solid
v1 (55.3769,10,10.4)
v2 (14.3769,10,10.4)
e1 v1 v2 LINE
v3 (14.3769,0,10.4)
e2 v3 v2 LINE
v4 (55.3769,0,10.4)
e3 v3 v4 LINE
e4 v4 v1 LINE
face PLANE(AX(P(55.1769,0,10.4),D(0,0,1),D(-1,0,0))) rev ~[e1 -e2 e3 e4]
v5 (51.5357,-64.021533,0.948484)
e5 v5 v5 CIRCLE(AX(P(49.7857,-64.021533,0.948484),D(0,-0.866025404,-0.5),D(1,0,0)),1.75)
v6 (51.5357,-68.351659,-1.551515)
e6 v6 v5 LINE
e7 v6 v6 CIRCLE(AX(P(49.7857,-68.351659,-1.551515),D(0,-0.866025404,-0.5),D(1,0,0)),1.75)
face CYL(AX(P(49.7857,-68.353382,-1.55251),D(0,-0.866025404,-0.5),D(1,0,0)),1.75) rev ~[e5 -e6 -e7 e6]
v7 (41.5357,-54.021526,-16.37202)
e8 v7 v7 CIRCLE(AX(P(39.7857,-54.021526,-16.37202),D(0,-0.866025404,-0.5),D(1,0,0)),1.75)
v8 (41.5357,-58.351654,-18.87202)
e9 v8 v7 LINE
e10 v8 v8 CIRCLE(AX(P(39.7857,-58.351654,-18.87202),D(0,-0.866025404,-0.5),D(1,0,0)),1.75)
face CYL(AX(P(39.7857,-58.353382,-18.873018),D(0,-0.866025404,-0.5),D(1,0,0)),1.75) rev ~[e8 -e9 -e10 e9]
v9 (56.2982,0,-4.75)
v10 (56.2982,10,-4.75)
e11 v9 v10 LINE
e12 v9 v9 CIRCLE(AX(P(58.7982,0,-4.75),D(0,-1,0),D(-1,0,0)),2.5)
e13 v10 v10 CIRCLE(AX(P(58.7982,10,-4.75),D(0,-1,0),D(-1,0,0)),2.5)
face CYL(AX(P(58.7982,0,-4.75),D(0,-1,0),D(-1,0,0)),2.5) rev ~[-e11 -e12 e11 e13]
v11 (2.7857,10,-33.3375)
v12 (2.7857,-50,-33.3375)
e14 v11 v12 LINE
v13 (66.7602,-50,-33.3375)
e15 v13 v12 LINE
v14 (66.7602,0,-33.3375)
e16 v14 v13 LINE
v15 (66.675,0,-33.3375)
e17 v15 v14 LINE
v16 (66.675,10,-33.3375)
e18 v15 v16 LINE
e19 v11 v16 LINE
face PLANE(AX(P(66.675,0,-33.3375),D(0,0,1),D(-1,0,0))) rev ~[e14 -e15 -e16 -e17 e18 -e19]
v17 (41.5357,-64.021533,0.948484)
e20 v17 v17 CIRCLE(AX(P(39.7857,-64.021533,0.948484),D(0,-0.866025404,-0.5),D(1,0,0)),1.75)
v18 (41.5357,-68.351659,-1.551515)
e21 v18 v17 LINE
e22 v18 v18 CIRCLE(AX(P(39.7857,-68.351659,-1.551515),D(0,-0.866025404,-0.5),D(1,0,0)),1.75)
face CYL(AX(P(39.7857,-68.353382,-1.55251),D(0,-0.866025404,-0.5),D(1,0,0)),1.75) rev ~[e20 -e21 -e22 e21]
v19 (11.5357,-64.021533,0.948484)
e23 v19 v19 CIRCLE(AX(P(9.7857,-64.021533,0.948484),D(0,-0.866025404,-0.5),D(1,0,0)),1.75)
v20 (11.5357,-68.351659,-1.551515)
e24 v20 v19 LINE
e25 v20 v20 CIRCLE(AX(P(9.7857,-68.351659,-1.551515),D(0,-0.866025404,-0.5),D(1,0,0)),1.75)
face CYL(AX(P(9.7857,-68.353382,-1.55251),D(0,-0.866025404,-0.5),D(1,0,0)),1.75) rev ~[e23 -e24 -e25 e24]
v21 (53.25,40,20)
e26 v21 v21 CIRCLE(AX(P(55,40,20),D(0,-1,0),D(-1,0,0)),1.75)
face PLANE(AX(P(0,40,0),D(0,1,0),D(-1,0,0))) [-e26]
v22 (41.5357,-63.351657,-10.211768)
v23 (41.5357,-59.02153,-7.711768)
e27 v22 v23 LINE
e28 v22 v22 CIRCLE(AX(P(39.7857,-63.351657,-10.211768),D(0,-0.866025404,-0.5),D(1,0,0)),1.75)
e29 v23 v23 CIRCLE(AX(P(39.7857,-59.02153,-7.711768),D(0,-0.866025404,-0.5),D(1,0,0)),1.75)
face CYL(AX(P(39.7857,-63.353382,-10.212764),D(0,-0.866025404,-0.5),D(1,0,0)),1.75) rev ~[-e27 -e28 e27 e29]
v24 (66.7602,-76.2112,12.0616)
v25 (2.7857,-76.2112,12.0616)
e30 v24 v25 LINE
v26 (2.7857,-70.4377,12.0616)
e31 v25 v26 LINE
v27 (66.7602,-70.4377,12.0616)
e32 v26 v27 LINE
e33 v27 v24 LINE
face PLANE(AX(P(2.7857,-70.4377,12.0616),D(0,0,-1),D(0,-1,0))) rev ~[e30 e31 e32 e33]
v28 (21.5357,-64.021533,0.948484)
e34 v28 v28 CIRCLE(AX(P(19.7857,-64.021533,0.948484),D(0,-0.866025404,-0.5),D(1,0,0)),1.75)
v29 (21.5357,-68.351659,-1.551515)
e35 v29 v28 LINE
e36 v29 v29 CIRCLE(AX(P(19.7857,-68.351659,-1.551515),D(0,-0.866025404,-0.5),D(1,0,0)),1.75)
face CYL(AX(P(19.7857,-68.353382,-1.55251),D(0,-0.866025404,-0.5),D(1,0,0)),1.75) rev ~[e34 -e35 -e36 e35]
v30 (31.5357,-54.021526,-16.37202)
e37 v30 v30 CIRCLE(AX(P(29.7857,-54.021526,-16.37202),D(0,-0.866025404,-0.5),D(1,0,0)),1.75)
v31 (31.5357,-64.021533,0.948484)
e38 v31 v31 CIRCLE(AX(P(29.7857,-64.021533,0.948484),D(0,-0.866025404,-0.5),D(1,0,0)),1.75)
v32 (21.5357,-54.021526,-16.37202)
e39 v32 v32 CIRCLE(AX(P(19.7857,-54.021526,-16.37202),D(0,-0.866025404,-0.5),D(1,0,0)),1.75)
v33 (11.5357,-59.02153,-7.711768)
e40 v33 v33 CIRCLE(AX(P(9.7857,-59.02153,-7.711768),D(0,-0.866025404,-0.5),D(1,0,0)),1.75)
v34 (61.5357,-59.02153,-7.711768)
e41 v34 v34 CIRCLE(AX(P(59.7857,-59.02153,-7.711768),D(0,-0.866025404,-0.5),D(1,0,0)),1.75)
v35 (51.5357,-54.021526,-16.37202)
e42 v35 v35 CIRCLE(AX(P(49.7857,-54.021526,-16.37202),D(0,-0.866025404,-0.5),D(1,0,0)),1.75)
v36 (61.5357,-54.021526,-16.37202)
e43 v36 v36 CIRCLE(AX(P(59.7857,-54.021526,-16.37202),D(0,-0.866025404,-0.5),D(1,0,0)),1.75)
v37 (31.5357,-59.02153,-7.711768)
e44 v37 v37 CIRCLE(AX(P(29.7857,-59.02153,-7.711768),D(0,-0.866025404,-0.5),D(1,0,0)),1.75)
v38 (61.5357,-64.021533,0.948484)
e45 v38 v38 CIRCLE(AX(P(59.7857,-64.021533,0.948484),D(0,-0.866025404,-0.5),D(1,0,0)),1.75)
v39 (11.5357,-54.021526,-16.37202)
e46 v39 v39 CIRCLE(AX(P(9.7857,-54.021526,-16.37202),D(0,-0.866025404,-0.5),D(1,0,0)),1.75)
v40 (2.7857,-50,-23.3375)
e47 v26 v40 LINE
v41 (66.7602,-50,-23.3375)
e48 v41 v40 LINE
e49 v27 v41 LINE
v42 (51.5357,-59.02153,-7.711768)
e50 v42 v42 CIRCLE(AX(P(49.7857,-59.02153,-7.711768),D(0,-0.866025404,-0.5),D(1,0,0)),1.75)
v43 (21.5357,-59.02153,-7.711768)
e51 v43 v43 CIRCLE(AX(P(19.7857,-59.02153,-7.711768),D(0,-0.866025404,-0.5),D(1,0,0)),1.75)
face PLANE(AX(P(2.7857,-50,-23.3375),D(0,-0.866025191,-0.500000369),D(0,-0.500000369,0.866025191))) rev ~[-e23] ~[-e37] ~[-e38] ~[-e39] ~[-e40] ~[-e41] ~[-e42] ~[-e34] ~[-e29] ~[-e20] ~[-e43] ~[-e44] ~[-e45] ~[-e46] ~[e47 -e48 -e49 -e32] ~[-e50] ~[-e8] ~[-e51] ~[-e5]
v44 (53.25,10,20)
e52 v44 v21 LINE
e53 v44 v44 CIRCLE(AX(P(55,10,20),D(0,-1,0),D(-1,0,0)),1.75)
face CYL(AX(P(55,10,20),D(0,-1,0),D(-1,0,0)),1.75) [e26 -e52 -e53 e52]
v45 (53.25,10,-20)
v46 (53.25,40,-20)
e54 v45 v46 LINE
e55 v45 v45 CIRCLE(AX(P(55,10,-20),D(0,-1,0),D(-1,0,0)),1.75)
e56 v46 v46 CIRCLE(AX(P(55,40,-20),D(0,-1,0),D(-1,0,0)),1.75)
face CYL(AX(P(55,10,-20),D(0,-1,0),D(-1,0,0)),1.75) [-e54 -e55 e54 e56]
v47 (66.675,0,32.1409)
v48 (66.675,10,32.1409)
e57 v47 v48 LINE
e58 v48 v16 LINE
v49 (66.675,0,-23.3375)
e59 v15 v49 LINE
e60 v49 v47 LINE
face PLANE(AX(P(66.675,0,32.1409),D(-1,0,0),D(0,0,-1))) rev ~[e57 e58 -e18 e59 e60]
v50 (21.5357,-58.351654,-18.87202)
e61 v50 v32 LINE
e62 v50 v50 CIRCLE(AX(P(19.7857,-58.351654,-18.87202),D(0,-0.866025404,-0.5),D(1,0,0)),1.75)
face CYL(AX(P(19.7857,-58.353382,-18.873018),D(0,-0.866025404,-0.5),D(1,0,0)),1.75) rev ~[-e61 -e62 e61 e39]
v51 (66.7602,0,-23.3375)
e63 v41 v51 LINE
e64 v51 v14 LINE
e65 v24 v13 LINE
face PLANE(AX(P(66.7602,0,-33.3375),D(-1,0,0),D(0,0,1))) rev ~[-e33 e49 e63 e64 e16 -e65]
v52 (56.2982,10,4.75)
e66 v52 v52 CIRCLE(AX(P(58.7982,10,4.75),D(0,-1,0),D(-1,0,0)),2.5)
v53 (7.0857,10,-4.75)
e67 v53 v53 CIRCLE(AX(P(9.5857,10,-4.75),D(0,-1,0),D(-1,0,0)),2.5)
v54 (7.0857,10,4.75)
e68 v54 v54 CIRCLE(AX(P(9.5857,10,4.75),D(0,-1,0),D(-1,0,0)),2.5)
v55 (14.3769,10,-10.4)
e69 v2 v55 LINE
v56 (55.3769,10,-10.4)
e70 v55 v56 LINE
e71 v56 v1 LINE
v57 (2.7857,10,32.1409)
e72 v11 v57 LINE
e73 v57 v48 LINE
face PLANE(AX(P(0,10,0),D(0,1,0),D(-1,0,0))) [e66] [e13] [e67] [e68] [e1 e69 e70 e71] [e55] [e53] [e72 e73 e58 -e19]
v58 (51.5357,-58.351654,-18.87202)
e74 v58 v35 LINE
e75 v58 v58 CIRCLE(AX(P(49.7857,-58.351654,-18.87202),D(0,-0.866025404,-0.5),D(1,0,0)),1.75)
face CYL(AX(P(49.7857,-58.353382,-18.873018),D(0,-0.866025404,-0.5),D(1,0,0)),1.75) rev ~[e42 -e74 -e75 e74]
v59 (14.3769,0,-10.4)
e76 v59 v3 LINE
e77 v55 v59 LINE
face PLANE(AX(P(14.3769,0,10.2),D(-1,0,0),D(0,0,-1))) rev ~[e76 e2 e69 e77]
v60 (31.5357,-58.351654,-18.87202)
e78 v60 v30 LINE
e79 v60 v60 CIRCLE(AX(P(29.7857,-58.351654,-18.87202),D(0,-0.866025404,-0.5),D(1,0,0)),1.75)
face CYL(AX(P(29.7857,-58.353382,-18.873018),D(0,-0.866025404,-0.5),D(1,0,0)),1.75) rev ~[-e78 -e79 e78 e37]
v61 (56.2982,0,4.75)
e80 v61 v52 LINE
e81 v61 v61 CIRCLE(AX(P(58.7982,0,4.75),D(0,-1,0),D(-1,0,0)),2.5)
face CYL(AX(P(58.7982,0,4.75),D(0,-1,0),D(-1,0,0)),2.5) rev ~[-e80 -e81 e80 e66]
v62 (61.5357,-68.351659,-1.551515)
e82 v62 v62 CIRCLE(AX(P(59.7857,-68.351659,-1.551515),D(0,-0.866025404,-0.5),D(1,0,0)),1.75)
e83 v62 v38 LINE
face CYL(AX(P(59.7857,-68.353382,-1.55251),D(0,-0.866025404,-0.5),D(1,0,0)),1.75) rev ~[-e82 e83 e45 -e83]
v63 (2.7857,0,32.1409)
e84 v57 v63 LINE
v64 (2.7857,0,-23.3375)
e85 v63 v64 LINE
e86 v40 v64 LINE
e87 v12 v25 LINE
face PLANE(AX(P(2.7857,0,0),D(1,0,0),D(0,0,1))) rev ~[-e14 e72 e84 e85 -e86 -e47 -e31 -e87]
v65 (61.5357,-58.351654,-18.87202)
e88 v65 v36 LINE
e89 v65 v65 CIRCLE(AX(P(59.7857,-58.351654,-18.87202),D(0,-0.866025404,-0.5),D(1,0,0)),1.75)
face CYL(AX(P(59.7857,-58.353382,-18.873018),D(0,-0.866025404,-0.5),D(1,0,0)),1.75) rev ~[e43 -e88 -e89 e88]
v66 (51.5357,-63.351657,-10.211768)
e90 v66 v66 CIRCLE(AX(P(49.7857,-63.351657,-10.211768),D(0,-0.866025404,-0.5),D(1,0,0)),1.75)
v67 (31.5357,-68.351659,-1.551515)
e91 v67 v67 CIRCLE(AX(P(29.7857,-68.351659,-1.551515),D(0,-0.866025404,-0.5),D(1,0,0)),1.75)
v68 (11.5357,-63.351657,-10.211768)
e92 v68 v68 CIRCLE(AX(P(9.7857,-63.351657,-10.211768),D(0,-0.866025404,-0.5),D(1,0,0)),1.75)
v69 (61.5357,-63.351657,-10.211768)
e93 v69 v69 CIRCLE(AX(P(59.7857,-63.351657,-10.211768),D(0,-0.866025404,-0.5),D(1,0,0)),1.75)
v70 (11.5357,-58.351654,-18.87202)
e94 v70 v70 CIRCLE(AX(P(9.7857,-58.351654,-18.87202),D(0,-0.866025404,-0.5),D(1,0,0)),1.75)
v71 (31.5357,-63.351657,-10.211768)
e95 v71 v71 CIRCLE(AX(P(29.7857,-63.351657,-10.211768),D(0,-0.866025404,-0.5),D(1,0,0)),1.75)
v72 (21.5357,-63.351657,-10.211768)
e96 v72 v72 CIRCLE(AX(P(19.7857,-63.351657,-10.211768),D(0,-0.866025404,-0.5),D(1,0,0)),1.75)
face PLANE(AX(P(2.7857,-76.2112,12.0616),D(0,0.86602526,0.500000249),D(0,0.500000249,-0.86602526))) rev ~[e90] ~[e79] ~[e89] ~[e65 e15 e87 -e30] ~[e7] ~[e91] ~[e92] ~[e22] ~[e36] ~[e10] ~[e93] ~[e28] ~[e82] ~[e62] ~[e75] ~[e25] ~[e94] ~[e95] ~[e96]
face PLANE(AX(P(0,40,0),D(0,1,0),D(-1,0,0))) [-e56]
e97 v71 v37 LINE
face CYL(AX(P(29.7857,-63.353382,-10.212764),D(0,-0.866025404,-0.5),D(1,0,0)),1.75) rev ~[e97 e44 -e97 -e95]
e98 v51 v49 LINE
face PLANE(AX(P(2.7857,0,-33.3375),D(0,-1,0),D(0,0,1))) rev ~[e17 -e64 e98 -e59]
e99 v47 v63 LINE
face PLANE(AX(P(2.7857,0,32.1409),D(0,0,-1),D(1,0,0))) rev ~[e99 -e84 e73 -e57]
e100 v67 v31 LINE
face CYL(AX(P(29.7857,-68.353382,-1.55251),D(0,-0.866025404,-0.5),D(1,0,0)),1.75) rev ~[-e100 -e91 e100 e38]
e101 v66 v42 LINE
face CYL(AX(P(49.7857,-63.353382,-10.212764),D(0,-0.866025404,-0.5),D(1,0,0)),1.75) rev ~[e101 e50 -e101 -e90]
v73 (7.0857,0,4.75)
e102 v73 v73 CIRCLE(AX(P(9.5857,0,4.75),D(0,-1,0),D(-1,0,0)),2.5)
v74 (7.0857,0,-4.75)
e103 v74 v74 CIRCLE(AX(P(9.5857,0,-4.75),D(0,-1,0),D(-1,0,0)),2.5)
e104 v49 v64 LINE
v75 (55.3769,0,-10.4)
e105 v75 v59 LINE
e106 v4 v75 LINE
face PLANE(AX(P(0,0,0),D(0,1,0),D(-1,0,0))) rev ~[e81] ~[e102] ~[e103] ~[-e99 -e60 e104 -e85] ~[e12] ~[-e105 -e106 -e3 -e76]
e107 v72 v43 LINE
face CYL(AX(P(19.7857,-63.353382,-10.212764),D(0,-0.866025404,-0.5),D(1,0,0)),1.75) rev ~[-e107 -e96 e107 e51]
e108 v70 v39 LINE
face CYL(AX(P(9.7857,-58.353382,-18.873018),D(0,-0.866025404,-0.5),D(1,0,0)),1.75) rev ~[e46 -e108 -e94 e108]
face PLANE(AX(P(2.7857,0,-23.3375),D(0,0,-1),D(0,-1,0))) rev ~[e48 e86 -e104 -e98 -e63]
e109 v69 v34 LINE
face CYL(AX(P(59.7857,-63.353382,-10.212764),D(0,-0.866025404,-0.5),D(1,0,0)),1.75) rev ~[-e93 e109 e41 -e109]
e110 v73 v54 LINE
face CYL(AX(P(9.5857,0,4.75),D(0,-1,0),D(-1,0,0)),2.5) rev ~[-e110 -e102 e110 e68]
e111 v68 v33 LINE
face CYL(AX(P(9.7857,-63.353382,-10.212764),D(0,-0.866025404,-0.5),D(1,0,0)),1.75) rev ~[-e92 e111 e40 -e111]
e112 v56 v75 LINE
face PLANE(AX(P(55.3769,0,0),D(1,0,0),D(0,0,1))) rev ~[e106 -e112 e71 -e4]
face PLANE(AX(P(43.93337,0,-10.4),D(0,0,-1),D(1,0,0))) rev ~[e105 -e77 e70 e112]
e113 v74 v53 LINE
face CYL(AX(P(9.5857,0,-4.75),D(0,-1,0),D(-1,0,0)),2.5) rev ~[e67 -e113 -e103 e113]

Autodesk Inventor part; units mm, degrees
ref_plane "YZ Plane" through (0, 0, 0) normal (1, 0, 0) x (0, 1, 0)
ref_plane "XZ Plane" through (0, 0, 0) normal (0, 1, 0) x (-1, 0, 0)
ref_plane "XY Plane" through (0, 0, 0) normal (0, 0, 1) x (1, 0, 0)
sketch "Sketch1" plane through (0, 0, 0) normal (0, 1, 0) x (-1, 0, 0)
  circle A0 centre (-55, 20) radius 2.75
  circle A1 centre (-55, -20) radius 2.75
  circle A2 centre (-55, 20) radius 8
  circle A3 centre (-55, -20) radius 8
  circle A4 centre (-25.5769, 0) radius 21
  line L0 (-55.1769, 10.2) -> (-14.5769, 10.2)
  line L1 (-14.5769, 10.2) -> (-14.5769, -10.2)
  line L2 (-14.5769, -10.2) -> (-55.1769, -10.2)
  line L3 (-55.1769, -10.2) -> (-55.1769, 10.2)
  line L4 (-14.5769, 10.2) -> (-7.7769, 10.2)
  line L5 (-7.7769, 10.2) -> (-7.7769, -10.2)
  line L6 (-7.7769, -10.2) -> (-14.5769, -10.2)
  line L7 (-14.5769, -10.2) -> (-14.5769, 10.2)
  line L8 (-55.1769, 10.2) -> (-61.9769, 10.2)
  line L9 (-61.9769, 10.2) -> (-61.9769, -10.2)
  line L10 (-61.9769, -10.2) -> (-55.1769, -10.2)
  line L11 (-55.1769, -10.2) -> (-55.1769, 10.2)
  circle A5 centre (-9.5857, -4.75) radius 2.5
  circle A6 centre (-9.5857, 4.75) radius 2.5
  line L12 (-9.5857, 4.75) -> (-9.5857, -4.75)
  line L13 (-9.5857, -10.2) -> (-9.5857, -4.75)
  line L14 (-9.5857, 4.75) -> (-9.5857, 10.2)
  line L15 (-25.5769, 10.2) -> (-25.5769, 21)
  line L16 (-25.5769, -10.2) -> (-25.5769, -21)
  line L17 (-25.5769, 0) -> (-55.1769, 0)
  line L18 (13.335, 0) -> (-80.01, 0) projected
  line L19 (0, -46.4332) -> (0, 45.2366) projected
  line L20 (-4.5769, 0) -> (-7.7769, 0)
  circle A7 centre (-25.5769, 0) radius 18.1
  circle A8 centre (-55, 20) radius 6
  circle A9 centre (-55, -20) radius 5.6406
  circle A10 centre (-58.7982, -4.75) radius 2.5
  circle A11 centre (-58.7982, 4.75) radius 2.5
  line L21 (-2.7857, 32.1409) -> (-66.675, 32.1409)
  line L22 (-66.675, 32.1409) -> (-66.675, -33.3375)
  line L23 (-66.675, -33.3375) -> (-2.7857, -33.3375)
  line L24 (-2.7857, -33.3375) -> (-2.7857, 32.1409)
  line L25 (-6.1769, 12) -> (-63.8933, 12)
  line L26 (-63.8933, 12) -> (-63.8933, -12)
  line L27 (-63.8933, -12) -> (-6.1769, -12)
  line L28 (-6.1769, -12) -> (-6.1769, 12)
  circle A12 centre (-55, -20) radius 1.75
  circle A13 centre (-55, 20) radius 1.75
  line L29 (-49, 32.1409) -> (-49, 20)
  point P0 (0, 0)
  point P1 (-8.5769, -5.0781)
  dimension "d23" = 12
  dimension "d56" = -0.2
  dimension "d0" = 5.5
  dimension "d1" = 5.5
  dimension "d2" = 16
  dimension "d3" = 16
  dimension "d5" = 42
  dimension "d6" = 40.6
  dimension "d7" = 20.4
  dimension "d8" = 6.8
  dimension "d9" = 6.8
  dimension "d10" = 5
  dimension "d11" = 5
  dimension "d16" = 9.5
  dimension "d17" = 29.6
  dimension "d20" = -55
  dimension "d21" = -55
  dimension "d22" = 36.2
  dimension "d24" = 5
  dimension "d25" = 5
  dimension "d26" = 9.5
  dimension "d27" = 20
  dimension "d28" = 20
  dimension "d31" = 1
extrude "Extrusion1" add sketch "Sketch1" along normal blind 10 contours A0 | A1 | A2 | A2 L29 L21 L24 L18 A4 L28 L25 | A2 L25 L26 L18 L22 L21 L29 | L25 A4 L0 L8 L9 L18 L26 | L25 A7 L0 A4 | A4 L15 A7 L25 | A4 L25 A7 L15 | L25 L15 L0 A7 | A7 L15 L25 | A3 | L26 L27 A4 L28 L18 L24 L23 L22 | L18 L9 L10 L2 A4 L27 L26 | L25 L28 A4 | A4 L28 L18 A7 A6 L5 L4 L25 | A7 L25 L15 | L3 L18 L9 L8 | L25 A7 L4 L0 L15 | L18 L3 L10 L9 | L18 L28 A4 | A4 L28 L18 | L2 A7 L27 A4 | L28 L27 A4 | A4 L27 A7 L6 L5 A5 L18 L28 | A7 L14 A6 L12 L18 L1 L4 | L4 L14 A7 | L27 A7 L16 A4 | L2 L16 L27 A7 | A4 L16 A7 L27 | A7 A5 L5 L18 | L18 L5 A6 A7 | L4 L5 A6 A7 L14 | A7 A6 L14 | L27 L16 A7 | L2 L6 A7 L27 L16 | L18 L12 A5 L13 A7 L6 L1 | A7 L16 L27 | L18 L12 A6 L5 | L5 A5 L12 L18 | A7 L13 L6 | L13 A7 A5 L5 L6 | L13 A5 A7 | A8 | A9 | A12 | A13
extrude "Extrusion2" add sketch "Sketch1" along normal blind 30 from surface at 10 contours A12 | A13
move faces "Move5" translate (0, 0, 0.2) faces at (41.6436, 6.6667, 10.2)
move faces "Move6" translate (0, 0, -0.2) faces at (28.1103, 6.6667, -10.2)
move faces "Move7" translate (0.2, 0, 0) faces at (55.1769, 3.3333, -3.4667)
move faces "Move8" translate (-0.2, 0, 0) faces at (14.5769, 3.3333, 3.4667)
sketch "Sketch2" plane through (2.7857, 0, -33.3375) normal (-1, 0, 0) x (0, 0, 1)
  line L0 (0, 0) -> (0, 10) projected
  line L1 (55.5625, 0) -> (55.5625, -40.2602)
  line L2 (0, 0) -> (65.4784, 0) projected
  line L3 (23.8125, 0) -> (23.8125, -55)
  line L4 (0, 0) -> (10, 0)
  line L5 (10, 0) -> (10, -50)
  line L6 (10, -50) -> (0, -50)
  line L7 (0, -50) -> (0, 0)
  line L8 (10, -50) -> (45.3991, -70.4377)
  line L9 (45.3991, -70.4377) -> (45.3991, -76.2112)
  line L10 (45.3991, -76.2112) -> (0, -50)
  line L11 (26.0875, 10) -> (26.0875, 0) projected
  line L12 (65.4784, 0) -> (65.4784, 10) projected
  line L13 (0, 10) -> (65.4784, 10) projected
  line L14 (0, 0) -> (65.4784, 0) projected
  line L15 (65.4784, 0) -> (65.4784, 10) projected
  line L16 (0, 10) -> (65.4784, 10) projected
  line L17 (0, 0) -> (0, 10) projected
  line L18 (35.5875, 0) -> (40.5875, 0) projected
  line L19 (26.0875, 10) -> (31.0875, 10) projected
  line L20 (26.0875, 0) -> (31.0875, 0) projected
  line L21 (26.0875, 0) -> (31.0875, 0) projected
  line L22 (43.7375, 0) -> (22.9375, 0) projected
  line L23 (22.9375, 0) -> (22.9375, 10) projected
  line L24 (43.7375, 10) -> (22.9375, 10) projected
  line L25 (43.7375, 0) -> (43.7375, 10) projected
  line L26 (43.7375, 0) -> (22.9375, 0) projected
  line L27 (22.9375, 0) -> (22.9375, 10) projected
  line L28 (43.7375, 10) -> (22.9375, 10) projected
  line L29 (43.7375, 0) -> (43.7375, 10) projected
  line L30 (65.4784, 0) -> (65.4784, 10) projected
  line L31 (65.4784, 0) -> (65.4784, 10) projected
  line L32 (65.4784, 0) -> (65.4784, 10) projected
  line L33 (51.5875, 10) -> (55.0875, 10) projected
  line L34 (11.5875, 10) -> (15.0875, 10) projected
  line L35 (65.4784, 10) -> (0, 10) projected
  line L36 (0, 10) -> (65.4784, 10) projected
  line L37 (35.5875, 10) -> (40.5875, 10) projected
  line L38 (43.7375, 10) -> (22.9375, 10) projected
  line L39 (22.9375, 10) -> (43.7375, 10) projected
  line L40 (35.5875, 10) -> (40.5875, 10) projected
  line L41 (26.0875, 10) -> (31.0875, 10) projected
  line L42 (26.0875, 10) -> (31.0875, 10) projected
  line L43 (0, 0) -> (65.4784, 0) projected
  line L44 (65.4784, 0) -> (0, 0) projected
  line L45 (35.5875, 0) -> (40.5875, 0) projected
  line L46 (43.7375, 0) -> (22.9375, 0) projected
  line L47 (22.9375, 0) -> (43.7375, 0) projected
  line L48 (35.5875, 0) -> (40.5875, 0) projected
  line L49 (26.0875, 0) -> (31.0875, 0) projected
  line L50 (26.0875, 0) -> (31.0875, 0) projected
  line L51 (65.4784, 10) -> (0, 10) projected
  line L52 (65.4784, 0) -> (0, 0) projected
  line L53 (0, 0) -> (0, 10) projected
  line L54 (65.4784, 10) -> (0, 10) projected
  line L55 (65.4784, 0) -> (65.4784, 10) projected
  line L56 (65.4784, 0) -> (0, 0) projected
  line L57 (51.5875, 10) -> (55.0875, 10) projected
  line L58 (43.7375, 0) -> (43.7375, 10) projected
  line L59 (43.7375, 0) -> (43.7375, 10) projected
  line L60 (0, 0) -> (0, 10) projected
  line L61 (0, 0) -> (0, 10) projected
  line L62 (0, 0) -> (0, 10) projected
  line L63 (22.9375, 0) -> (22.9375, 10) projected
  line L64 (22.9375, 0) -> (22.9375, 10) projected
  line L65 (26.0875, 10) -> (31.0875, 10) projected
  line L66 (26.0875, 0) -> (31.0875, 0) projected
  line L67 (43.7375, 0) -> (43.7375, 10) projected
  line L68 (22.9375, 0) -> (22.9375, 10) projected
  line L69 (22.9375, 0) -> (43.7375, 0) projected
  line L70 (22.9375, 0) -> (43.7375, 0) projected
  line L71 (43.7375, 0) -> (43.7375, 10) projected
  line L72 (22.9375, 10) -> (43.7375, 10) projected
  line L73 (22.9375, 0) -> (22.9375, 10) projected
  line L74 (35.5875, 10) -> (40.5875, 10) projected
  line L75 (35.5875, 10) -> (40.5875, 10) projected
  line L76 (35.5875, 0) -> (40.5875, 0) projected
  line L77 (22.9375, 10) -> (43.7375, 10) projected
  line L78 (26.0875, 10) -> (31.0875, 10) projected
  line L79 (51.5875, 10) -> (55.0875, 10) projected
  line L80 (51.5875, 40) -> (55.0875, 40) projected
  line L81 (51.5875, 40) -> (55.0875, 40) projected
  line L82 (51.5875, 40) -> (55.0875, 40) projected
  line L83 (35.5875, 10) -> (40.5875, 10) projected
  line L84 (35.5875, 0) -> (40.5875, 0) projected
  line L85 (35.5875, 10) -> (40.5875, 10) projected
  line L86 (26.0875, 10) -> (31.0875, 10) projected
  line L87 (35.5875, 0) -> (40.5875, 0) projected
  line L88 (26.0875, 0) -> (31.0875, 0) projected
  line L89 (11.5875, 10) -> (15.0875, 10) projected
  line L90 (11.5875, 40) -> (15.0875, 40) projected
  line L91 (11.5875, 40) -> (15.0875, 40) projected
  line L92 (11.5875, 10) -> (15.0875, 10) projected
  line L93 (11.5875, 40) -> (15.0875, 40) projected
  line L94 (-13.0957, 0) -> (78.5741, 0) projected
  point P0 (33.3375, 0)
  point P1 (10, 0)
  dimension "d63" = 55
  dimension "d64" = 10
  dimension "d65" = 120
  dimension "d66" = 120
  dimension "d102" = 50
extrude "Extrusion3" add sketch "Sketch2" against normal blind 65.5625 contours L2 L5 L6 L7 | L6 L8 L9 L10
move faces "Move9" translate (-1.588, 0, 0) faces at (68.3482, -16.6667, -30.0042) (27.9459, 0, 24.8939)
sketch "Sketch3" plane through (2.7857, -50, -33.3375) normal (0, -0.8660254, -0.5) x (1, 0, 0)
  circle A0 centre (57, 36.7033) radius 1.75
  circle A1 centre (47, 36.7033) radius 1.75
  circle A2 centre (37, 36.7033) radius 1.75
  line L0 (57, 36.7033) -> (47, 36.7033)
  line L1 (37, 36.7033) -> (47, 36.7033)
  circle A3 centre (57, 26.7033) radius 1.75
  circle A4 centre (47, 26.7033) radius 1.75
  circle A5 centre (37, 26.7033) radius 1.75
  line L2 (57, 26.7033) -> (47, 26.7033)
  line L3 (37, 26.7033) -> (47, 26.7033)
  circle A6 centre (57, 16.7033) radius 1.75
  circle A7 centre (47, 16.7033) radius 1.75
  circle A8 centre (37, 16.7033) radius 1.75
  line L4 (57, 16.7033) -> (47, 16.7033)
  line L5 (37, 16.7033) -> (47, 16.7033)
  circle A9 centre (27, 16.7033) radius 1.75
  circle A10 centre (17, 16.7033) radius 1.75
  circle A11 centre (7, 16.7033) radius 1.75
  line L6 (27, 16.7033) -> (17, 16.7033)
  line L7 (7, 16.7033) -> (17, 16.7033)
  circle A12 centre (27, 36.7033) radius 1.75
  circle A13 centre (17, 36.7033) radius 1.75
  circle A14 centre (7, 36.7033) radius 1.75
  line L8 (27, 36.7033) -> (17, 36.7033)
  line L9 (7, 36.7033) -> (17, 36.7033)
  circle A15 centre (27, 26.7033) radius 1.75
  circle A16 centre (17, 26.7033) radius 1.75
  circle A17 centre (7, 26.7033) radius 1.75
  line L10 (27, 26.7033) -> (17, 26.7033)
  line L11 (7, 26.7033) -> (17, 26.7033)
  line L12 (58.75, 36.7033) -> (64.329, 36.7033)
  line L13 (0, 49.5356) -> (0, 8.6603) projected
  line L14 (0, 36.7033) -> (7, 36.7033)
  point P0 (-2.7857, 3.8711)
  dimension "d72" = 3.5
  dimension "d73" = 10
  dimension "d74" = 3.5
  dimension "d75" = 10
  dimension "d76" = 0
  dimension "d77" = 10
  dimension "d78" = 3.5
  dimension "d79" = 10
  dimension "d84" = 3.5
  dimension "d85" = 10
  dimension "d90" = 3.5
  dimension "d91" = 10
  dimension "d92" = 3.5
  dimension "d93" = 10
  dimension "d94" = 0
  dimension "d95" = 10
  dimension "d96" = 10
  dimension "d97" = 10
  dimension "d98" = 10
  dimension "d101" = 7
extrude "Extrusion4" cut sketch "Sketch3" against normal blind 30
